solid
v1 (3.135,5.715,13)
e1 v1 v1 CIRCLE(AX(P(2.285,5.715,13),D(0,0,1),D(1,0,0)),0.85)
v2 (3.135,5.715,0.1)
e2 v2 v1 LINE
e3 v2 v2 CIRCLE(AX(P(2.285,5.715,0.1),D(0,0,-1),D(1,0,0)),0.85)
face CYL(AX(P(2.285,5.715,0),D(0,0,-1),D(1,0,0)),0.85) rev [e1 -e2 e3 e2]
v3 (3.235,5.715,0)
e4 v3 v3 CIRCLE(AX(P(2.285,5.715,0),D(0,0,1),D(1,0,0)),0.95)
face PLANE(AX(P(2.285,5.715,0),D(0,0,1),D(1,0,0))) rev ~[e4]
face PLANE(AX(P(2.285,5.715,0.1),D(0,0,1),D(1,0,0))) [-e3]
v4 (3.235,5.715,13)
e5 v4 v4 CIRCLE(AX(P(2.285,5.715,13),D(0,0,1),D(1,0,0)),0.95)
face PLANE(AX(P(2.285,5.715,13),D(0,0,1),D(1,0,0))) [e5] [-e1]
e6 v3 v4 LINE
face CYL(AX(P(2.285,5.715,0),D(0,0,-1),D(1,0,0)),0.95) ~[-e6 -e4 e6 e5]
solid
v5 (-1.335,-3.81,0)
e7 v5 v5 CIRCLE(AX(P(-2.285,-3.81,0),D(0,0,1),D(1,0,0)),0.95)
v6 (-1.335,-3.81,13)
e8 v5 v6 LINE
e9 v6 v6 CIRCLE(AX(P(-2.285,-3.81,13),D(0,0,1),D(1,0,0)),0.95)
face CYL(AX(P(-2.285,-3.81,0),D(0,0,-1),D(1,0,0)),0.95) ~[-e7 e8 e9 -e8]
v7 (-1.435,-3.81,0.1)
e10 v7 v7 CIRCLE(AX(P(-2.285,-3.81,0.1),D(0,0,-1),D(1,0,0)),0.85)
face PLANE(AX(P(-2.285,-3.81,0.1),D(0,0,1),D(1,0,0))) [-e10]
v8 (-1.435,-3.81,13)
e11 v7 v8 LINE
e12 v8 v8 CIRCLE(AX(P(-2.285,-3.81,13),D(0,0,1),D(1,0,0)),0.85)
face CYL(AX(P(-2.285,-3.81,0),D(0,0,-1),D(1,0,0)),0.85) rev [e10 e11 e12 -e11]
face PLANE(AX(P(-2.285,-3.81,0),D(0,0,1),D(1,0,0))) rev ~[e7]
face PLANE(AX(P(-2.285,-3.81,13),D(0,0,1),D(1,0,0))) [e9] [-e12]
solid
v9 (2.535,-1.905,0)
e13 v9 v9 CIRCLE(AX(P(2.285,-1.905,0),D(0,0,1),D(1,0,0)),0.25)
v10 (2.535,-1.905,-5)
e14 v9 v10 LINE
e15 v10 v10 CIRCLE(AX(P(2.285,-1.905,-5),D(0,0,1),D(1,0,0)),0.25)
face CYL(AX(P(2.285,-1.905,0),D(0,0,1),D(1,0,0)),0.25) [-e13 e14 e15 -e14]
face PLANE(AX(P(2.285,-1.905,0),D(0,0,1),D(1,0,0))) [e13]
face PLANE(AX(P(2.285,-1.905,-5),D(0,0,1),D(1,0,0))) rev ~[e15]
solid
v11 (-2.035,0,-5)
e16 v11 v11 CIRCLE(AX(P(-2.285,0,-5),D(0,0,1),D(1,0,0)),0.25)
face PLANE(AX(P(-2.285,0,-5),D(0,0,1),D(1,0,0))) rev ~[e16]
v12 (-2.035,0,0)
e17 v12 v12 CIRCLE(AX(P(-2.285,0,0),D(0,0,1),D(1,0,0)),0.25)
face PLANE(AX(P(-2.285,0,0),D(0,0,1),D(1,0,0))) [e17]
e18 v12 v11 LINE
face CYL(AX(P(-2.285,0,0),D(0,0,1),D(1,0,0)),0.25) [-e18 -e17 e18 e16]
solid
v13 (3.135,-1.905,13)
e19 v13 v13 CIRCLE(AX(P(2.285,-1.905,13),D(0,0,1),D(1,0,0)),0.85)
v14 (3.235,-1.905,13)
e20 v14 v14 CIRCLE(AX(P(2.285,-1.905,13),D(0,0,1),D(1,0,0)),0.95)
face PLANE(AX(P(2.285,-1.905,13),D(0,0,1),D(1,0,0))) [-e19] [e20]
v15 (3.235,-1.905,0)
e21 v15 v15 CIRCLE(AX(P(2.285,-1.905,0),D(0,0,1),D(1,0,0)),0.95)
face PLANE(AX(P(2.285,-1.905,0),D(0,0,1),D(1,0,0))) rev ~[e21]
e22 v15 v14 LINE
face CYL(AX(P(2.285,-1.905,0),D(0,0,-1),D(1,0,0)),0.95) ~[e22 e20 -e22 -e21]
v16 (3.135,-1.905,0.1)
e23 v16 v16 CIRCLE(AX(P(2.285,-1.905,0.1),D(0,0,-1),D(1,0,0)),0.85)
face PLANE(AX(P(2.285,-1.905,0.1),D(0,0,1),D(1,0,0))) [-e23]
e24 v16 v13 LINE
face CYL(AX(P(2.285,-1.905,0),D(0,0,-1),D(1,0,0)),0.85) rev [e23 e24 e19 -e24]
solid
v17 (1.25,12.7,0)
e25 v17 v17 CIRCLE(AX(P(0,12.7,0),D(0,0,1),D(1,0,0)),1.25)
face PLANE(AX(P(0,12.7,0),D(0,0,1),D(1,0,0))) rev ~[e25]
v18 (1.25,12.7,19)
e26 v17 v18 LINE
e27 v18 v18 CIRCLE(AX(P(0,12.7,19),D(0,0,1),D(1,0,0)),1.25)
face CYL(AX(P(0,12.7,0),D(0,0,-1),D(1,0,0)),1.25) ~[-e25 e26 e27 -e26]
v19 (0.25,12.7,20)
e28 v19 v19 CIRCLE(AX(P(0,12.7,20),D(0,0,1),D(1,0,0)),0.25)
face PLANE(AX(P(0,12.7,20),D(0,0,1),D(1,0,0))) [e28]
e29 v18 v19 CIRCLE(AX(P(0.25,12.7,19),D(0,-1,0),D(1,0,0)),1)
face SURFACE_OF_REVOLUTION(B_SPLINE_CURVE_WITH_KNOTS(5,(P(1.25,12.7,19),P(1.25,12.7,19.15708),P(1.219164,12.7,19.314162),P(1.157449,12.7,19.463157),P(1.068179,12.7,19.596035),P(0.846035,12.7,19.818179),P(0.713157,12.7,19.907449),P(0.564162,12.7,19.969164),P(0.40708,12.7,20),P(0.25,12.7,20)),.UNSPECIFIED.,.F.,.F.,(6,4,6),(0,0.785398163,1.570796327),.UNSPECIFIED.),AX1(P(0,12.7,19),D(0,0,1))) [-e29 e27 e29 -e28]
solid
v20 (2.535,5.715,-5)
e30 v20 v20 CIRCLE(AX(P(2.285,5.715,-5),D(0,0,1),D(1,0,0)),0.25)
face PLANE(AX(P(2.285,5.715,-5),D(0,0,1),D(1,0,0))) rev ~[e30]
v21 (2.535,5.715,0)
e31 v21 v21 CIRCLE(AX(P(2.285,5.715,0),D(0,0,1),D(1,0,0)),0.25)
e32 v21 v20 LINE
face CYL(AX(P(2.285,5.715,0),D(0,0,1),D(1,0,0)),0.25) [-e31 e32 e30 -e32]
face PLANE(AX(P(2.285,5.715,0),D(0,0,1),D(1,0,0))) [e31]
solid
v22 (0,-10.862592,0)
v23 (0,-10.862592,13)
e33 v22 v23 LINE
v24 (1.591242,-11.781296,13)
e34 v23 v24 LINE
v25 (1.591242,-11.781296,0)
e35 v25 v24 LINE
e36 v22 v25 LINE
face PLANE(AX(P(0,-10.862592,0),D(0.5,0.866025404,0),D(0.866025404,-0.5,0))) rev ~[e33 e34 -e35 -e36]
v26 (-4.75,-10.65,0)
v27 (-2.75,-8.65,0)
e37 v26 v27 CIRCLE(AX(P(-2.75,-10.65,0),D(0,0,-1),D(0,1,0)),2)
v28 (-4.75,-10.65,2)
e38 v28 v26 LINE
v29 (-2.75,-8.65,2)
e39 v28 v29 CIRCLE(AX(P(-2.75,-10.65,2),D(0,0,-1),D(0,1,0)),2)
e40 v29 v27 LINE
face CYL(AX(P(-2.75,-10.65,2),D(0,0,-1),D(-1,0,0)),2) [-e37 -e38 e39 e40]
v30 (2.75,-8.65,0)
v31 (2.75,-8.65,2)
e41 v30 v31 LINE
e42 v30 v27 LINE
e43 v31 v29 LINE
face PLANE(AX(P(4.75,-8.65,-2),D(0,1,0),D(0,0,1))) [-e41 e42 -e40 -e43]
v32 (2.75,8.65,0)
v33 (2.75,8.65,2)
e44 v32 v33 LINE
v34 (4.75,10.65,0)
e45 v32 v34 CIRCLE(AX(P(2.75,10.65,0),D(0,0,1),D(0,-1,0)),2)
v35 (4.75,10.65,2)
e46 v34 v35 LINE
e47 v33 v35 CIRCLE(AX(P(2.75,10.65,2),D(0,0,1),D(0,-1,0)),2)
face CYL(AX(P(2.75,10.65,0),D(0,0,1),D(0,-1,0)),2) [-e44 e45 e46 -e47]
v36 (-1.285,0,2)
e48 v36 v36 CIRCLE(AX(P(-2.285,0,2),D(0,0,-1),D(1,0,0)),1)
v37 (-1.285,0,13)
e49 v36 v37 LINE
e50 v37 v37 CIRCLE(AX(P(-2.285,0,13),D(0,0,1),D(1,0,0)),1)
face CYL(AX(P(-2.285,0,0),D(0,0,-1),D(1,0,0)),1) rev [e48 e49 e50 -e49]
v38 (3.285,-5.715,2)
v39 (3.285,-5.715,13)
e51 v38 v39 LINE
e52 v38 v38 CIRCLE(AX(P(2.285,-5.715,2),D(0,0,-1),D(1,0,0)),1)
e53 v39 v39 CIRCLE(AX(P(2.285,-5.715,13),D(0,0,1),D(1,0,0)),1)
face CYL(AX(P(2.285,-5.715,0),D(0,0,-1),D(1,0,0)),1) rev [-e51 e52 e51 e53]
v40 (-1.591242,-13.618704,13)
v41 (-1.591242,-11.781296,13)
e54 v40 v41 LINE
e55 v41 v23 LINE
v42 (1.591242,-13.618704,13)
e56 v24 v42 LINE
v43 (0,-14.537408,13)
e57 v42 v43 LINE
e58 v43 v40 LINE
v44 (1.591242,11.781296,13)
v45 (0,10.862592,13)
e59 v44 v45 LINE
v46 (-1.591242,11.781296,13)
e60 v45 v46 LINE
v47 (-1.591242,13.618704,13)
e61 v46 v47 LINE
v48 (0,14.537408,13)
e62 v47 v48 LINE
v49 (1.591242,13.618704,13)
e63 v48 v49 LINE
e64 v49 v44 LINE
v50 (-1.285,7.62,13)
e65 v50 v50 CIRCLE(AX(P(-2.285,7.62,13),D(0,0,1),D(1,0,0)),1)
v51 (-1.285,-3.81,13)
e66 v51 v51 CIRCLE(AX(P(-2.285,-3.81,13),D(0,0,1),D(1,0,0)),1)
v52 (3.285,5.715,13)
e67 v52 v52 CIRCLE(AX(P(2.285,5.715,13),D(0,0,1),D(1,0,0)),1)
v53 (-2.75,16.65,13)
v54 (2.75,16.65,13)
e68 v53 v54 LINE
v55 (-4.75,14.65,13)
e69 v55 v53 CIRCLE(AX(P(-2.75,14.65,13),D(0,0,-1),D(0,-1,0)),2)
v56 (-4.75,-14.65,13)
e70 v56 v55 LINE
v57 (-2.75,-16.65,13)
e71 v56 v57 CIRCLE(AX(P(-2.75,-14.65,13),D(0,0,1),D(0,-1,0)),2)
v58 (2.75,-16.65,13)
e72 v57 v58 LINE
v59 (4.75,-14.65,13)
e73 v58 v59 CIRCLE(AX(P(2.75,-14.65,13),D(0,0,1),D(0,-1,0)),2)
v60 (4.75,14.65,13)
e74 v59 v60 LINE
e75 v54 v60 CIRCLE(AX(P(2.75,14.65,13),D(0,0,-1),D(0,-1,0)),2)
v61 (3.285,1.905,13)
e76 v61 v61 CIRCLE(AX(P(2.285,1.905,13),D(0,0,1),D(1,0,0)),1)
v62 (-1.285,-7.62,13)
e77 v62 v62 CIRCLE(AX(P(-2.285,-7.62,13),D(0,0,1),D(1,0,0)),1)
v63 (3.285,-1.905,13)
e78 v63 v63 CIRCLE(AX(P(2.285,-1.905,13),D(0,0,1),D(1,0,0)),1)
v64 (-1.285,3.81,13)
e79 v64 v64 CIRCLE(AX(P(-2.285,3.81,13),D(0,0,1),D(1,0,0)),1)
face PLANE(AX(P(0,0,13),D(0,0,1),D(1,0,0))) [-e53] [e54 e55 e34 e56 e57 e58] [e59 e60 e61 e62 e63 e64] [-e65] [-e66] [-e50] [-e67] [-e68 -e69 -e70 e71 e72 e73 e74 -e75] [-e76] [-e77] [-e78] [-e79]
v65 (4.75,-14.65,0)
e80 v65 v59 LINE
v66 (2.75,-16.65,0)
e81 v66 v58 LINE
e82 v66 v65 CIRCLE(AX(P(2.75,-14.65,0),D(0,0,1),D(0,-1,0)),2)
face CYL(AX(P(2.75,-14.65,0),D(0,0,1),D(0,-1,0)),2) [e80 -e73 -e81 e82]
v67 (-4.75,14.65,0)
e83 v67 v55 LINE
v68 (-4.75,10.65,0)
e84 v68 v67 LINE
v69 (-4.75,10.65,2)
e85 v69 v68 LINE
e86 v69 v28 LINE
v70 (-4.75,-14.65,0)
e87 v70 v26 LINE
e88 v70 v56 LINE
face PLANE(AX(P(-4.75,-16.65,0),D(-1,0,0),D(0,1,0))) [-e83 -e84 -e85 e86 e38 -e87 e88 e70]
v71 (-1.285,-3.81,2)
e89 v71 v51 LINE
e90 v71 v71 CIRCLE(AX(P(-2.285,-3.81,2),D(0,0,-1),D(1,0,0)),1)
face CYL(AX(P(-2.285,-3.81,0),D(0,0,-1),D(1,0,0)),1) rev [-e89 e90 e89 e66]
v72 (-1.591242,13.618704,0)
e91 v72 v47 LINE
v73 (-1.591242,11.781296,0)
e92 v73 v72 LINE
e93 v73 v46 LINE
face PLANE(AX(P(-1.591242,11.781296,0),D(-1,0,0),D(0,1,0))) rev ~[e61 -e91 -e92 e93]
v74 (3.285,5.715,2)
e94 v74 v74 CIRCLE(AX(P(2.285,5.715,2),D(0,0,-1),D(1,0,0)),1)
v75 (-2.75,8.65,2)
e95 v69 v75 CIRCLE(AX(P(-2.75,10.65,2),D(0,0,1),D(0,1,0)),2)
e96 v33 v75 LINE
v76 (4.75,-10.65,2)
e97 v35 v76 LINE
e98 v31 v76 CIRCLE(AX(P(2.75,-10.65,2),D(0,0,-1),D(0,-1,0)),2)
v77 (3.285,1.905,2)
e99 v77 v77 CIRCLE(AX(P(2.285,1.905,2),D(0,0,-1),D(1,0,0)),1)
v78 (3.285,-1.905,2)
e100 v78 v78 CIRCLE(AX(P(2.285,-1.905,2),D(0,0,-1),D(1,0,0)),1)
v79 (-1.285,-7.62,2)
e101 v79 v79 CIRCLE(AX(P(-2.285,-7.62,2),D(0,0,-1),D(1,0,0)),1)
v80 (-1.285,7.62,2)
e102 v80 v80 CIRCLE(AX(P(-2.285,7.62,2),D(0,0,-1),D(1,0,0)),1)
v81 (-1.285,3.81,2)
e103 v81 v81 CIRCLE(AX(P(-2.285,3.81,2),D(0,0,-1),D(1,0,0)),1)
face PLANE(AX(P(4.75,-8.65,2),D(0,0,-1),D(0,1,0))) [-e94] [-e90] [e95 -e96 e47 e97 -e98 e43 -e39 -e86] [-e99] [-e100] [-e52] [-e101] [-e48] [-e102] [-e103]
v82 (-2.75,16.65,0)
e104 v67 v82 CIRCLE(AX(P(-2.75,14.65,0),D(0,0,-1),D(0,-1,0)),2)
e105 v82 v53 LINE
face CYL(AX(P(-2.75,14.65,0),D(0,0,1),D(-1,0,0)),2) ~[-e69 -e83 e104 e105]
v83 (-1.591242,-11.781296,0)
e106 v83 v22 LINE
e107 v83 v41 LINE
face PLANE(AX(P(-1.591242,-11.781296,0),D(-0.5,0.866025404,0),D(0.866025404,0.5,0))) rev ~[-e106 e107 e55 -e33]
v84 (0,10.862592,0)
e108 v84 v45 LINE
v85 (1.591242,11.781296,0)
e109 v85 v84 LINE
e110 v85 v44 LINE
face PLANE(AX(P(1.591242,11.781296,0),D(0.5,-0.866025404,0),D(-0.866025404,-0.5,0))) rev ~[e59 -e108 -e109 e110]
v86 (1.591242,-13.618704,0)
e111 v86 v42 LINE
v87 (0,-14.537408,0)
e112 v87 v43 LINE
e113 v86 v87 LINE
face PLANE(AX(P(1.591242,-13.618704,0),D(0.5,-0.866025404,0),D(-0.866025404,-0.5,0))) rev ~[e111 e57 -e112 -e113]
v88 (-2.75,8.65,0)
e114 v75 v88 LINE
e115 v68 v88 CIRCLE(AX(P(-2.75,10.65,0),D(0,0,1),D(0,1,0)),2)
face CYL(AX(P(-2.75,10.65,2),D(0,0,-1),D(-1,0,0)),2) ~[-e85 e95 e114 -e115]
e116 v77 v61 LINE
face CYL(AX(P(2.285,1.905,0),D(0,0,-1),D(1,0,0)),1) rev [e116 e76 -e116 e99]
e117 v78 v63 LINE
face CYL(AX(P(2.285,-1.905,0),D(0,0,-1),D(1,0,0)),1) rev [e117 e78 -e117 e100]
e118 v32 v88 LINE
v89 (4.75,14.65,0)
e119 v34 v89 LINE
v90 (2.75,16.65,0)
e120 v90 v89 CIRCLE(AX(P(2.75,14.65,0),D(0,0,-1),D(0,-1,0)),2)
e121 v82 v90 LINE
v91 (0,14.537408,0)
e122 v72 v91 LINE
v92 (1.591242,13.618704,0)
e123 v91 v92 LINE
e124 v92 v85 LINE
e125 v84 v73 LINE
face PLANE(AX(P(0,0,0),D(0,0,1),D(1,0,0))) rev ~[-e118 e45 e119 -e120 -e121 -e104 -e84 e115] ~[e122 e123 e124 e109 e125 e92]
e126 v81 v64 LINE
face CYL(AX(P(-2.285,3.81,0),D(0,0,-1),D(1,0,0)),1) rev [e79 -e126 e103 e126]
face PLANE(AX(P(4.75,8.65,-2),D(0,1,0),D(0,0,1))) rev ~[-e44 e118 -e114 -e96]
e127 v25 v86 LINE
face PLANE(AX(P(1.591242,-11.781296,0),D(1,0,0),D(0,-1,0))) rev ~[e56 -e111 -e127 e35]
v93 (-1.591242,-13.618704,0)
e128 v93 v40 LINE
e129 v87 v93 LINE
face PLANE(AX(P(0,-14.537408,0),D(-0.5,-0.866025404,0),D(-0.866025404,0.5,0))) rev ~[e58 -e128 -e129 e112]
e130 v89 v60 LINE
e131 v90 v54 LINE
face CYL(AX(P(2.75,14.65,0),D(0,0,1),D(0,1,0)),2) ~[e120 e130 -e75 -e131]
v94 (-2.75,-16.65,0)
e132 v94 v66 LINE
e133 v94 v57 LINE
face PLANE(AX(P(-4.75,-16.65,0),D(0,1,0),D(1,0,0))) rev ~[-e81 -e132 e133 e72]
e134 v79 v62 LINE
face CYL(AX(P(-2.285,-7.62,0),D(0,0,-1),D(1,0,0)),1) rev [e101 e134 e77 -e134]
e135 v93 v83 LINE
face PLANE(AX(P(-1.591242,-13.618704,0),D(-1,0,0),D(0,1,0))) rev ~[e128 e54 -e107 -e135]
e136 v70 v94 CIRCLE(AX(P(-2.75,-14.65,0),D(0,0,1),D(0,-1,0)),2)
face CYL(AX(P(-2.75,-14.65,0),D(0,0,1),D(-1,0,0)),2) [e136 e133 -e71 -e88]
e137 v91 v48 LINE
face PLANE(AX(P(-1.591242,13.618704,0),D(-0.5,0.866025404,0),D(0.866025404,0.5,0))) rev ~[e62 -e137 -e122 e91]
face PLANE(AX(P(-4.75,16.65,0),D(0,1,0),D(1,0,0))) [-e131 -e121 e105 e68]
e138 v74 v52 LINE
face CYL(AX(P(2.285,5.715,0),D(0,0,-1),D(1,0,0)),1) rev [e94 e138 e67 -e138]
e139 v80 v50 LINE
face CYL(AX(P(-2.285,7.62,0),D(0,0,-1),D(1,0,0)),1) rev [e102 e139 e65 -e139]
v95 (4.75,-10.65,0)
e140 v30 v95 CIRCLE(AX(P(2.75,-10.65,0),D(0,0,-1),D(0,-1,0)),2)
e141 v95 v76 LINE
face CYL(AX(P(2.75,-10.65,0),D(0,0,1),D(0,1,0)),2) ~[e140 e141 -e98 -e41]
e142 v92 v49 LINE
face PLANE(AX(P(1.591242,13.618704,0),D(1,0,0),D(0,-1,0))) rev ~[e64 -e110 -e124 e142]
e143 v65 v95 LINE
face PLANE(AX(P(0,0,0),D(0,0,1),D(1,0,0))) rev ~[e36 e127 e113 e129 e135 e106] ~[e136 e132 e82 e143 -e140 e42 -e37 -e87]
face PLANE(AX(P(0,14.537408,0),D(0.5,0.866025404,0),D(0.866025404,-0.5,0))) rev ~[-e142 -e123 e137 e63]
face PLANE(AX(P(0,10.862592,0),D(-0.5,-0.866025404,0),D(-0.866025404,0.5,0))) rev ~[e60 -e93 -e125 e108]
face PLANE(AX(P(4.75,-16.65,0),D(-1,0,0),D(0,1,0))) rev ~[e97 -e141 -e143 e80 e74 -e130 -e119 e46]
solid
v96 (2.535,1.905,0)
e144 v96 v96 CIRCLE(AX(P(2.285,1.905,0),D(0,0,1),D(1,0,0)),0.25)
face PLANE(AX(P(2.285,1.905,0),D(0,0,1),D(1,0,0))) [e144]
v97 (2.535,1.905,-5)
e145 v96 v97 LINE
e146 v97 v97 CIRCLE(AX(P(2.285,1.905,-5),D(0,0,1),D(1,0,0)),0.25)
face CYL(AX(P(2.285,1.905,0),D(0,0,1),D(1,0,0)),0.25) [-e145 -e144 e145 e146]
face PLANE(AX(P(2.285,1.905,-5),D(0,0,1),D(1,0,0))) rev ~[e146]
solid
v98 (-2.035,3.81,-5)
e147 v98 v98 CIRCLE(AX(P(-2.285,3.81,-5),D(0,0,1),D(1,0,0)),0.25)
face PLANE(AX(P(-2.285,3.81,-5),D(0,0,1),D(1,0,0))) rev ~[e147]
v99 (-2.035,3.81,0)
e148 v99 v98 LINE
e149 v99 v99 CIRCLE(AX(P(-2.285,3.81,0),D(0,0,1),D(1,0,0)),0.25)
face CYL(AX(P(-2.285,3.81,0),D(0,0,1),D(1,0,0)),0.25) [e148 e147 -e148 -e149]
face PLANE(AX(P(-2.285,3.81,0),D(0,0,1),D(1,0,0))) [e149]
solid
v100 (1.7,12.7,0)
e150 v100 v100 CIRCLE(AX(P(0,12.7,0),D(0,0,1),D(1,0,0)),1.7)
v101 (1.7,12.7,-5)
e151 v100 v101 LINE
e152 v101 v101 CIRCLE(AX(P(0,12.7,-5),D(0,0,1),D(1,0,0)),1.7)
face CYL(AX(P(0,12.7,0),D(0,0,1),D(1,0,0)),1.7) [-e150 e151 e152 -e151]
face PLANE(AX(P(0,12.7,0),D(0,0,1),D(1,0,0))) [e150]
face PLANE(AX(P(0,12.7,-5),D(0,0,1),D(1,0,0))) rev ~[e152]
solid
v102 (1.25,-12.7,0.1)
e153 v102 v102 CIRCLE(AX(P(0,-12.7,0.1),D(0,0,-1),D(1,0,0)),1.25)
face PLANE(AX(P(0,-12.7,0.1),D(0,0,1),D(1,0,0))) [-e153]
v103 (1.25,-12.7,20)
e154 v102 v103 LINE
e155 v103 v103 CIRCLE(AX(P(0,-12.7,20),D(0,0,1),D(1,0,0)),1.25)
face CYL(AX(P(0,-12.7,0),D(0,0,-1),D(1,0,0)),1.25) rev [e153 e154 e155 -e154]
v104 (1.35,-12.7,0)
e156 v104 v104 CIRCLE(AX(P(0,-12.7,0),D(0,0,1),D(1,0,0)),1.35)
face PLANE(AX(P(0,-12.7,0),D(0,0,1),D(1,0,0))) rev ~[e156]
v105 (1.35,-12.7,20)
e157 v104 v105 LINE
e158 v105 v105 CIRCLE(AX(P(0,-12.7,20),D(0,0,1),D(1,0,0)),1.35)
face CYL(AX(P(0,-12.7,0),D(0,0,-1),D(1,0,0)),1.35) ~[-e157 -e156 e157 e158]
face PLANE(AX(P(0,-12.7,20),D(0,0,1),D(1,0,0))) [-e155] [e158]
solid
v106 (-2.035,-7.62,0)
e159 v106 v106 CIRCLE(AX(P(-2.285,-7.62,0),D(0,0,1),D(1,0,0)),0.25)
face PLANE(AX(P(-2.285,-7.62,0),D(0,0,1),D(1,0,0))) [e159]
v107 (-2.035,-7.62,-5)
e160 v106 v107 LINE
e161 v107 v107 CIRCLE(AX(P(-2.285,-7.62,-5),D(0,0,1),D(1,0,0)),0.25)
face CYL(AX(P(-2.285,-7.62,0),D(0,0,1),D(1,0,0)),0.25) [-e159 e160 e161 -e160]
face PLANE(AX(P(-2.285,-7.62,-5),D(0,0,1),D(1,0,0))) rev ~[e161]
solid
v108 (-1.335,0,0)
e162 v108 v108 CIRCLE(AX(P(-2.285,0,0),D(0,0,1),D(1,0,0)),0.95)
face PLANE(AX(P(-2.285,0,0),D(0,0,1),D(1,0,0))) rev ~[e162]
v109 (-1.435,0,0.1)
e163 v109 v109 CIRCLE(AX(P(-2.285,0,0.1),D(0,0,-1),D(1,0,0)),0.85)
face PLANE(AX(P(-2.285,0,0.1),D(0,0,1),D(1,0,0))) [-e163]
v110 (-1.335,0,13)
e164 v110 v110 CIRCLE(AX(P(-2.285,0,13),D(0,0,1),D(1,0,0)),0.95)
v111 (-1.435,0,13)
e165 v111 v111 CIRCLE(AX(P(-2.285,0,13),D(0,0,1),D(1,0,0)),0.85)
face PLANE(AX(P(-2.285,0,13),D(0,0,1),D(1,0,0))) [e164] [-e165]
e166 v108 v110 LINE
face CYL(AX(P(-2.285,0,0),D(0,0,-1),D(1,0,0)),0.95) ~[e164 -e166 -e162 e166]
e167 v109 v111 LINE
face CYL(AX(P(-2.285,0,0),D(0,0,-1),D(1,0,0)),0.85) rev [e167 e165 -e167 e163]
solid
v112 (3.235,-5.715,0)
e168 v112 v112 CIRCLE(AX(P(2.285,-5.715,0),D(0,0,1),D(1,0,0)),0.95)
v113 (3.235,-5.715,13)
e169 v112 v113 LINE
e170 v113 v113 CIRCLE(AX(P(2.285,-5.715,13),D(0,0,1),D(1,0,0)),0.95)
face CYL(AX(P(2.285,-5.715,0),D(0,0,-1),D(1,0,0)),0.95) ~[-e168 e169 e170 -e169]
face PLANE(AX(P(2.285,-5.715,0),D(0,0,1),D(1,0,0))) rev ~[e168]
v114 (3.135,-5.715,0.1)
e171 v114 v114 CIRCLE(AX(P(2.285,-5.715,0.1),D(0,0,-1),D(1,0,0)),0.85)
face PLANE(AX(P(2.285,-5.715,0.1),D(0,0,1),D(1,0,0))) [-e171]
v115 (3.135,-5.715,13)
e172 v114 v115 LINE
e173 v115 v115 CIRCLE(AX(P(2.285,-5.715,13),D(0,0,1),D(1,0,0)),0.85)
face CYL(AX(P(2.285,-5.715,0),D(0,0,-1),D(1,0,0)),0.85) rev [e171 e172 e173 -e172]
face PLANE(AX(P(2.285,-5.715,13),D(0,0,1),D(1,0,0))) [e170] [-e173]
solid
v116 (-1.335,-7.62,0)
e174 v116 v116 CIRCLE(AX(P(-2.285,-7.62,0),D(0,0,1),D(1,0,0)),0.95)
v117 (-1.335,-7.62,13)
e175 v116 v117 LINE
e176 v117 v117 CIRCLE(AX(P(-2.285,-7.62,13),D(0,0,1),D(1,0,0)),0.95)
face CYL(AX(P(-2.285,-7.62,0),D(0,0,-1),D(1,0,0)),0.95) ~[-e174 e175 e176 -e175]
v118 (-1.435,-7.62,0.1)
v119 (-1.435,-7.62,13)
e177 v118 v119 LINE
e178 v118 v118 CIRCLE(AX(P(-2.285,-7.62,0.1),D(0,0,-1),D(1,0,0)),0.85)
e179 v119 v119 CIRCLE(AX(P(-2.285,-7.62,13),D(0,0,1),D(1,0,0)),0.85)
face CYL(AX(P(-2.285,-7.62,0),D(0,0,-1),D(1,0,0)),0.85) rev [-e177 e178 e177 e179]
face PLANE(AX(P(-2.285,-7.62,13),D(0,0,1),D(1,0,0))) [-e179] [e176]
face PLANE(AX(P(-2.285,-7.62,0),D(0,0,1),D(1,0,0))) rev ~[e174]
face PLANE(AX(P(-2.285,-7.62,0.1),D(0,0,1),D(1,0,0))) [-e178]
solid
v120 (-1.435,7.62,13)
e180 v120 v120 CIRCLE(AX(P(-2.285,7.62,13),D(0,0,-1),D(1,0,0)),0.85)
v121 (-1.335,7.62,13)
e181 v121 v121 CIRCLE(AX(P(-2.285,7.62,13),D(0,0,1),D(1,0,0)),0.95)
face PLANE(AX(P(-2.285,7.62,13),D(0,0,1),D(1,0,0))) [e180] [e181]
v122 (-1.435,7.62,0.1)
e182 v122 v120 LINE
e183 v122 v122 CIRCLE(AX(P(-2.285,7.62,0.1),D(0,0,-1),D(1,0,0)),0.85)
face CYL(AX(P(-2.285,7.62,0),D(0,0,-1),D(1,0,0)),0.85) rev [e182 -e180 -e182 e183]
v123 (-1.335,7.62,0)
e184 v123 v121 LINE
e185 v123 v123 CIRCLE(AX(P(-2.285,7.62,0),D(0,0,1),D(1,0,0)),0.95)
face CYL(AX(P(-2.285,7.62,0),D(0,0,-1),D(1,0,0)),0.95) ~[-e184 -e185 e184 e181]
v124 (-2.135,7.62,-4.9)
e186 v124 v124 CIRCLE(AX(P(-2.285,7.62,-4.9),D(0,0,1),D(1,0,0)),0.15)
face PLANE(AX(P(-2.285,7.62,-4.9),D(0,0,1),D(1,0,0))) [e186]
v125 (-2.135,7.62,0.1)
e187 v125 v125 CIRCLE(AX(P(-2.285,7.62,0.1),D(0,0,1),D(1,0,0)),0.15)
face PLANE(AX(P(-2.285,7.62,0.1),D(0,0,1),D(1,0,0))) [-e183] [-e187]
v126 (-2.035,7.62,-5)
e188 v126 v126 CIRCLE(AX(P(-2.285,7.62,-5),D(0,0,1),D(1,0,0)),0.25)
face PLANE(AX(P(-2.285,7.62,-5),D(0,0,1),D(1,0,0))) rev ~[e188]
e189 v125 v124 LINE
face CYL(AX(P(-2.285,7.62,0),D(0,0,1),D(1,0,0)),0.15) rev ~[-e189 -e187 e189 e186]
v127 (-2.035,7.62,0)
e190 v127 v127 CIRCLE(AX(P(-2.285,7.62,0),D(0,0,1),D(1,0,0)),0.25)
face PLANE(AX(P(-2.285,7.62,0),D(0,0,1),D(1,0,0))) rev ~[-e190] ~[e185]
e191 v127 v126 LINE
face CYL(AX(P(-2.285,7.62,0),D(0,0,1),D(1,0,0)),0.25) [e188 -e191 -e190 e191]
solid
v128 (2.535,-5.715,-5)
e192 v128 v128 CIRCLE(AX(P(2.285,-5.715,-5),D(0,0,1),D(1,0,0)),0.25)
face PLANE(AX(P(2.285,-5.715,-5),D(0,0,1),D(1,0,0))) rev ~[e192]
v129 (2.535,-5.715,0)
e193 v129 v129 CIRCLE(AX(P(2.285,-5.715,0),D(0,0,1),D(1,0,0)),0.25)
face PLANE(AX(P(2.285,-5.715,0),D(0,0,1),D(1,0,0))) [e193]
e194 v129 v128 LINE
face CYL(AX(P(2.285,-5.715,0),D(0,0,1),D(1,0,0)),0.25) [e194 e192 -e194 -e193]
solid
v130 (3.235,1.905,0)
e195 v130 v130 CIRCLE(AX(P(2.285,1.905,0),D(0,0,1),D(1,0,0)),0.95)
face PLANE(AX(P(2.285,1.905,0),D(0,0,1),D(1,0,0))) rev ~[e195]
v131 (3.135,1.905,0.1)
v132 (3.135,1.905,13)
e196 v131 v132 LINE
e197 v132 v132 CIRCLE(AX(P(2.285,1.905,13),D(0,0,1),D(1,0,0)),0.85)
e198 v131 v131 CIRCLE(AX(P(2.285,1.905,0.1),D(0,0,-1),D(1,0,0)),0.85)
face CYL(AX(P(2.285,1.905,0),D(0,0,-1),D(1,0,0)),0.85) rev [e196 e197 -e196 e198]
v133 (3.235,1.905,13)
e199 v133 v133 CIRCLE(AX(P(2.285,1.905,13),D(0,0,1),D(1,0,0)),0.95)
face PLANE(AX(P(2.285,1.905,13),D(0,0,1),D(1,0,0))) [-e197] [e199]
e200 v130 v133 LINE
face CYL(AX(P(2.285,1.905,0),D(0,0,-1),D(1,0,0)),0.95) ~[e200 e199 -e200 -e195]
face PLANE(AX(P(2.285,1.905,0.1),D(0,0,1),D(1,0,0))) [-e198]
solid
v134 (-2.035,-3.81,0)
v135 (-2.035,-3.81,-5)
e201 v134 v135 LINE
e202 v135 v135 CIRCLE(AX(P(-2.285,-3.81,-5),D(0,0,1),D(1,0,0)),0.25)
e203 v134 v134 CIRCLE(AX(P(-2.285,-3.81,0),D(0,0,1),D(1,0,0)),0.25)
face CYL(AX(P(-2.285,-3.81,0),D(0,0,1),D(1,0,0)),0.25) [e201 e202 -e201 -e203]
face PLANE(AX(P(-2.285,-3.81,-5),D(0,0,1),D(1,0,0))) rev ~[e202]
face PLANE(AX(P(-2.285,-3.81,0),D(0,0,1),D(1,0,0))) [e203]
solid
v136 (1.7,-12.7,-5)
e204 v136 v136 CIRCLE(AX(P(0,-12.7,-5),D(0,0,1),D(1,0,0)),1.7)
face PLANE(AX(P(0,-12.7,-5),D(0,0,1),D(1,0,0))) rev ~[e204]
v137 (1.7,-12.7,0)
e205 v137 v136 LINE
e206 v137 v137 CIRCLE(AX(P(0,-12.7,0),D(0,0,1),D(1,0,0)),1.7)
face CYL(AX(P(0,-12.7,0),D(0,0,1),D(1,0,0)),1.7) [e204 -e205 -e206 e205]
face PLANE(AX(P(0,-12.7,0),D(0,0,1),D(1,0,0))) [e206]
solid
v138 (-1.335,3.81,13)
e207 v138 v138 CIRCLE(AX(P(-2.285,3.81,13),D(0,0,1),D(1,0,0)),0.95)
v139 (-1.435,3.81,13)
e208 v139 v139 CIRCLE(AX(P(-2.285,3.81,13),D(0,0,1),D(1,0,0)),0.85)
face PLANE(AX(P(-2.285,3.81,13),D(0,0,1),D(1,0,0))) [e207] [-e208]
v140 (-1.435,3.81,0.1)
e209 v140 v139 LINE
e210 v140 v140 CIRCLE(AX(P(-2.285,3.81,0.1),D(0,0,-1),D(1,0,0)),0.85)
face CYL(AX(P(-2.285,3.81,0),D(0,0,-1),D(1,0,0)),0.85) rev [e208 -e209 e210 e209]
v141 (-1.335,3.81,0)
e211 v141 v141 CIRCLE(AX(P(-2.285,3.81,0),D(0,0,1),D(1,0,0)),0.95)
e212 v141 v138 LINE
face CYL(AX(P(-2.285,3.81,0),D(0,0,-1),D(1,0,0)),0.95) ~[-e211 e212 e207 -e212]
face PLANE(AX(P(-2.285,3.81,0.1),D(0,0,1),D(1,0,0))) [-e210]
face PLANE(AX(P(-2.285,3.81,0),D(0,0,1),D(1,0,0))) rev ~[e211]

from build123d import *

# Parameters (mm, degrees)
F0_W      = 9.5
F0_H      = 33.3
F0_R      = 1
F1_DEPTH  = 13
F2_W      = 17.3
F2_H      = 4
F3_DEPTH  = 9.501
F4_R      = 2
F5_R      = 0.25
F6_DEPTH  = 5
F7_R      = 0.95
F8_DEPTH  = 13
F9_T      = -0.1
F9_2_T    = -0.1
F9_3_T    = -0.1
F9_4_T    = -0.1
F9_5_T    = -0.1
F9_6_T    = -0.1
F9_7_T    = -0.1
F9_8_T    = -0.1
F9_9_T    = -0.1
F10_R     = 1.25
F11_DEPTH = 20
F10_R_2   = 1.35
F12_R     = 1
F13_R     = 1.7
F14_DEPTH = 5
F15_T     = -0.1


# Not quite as in the source:
# - a feature names something its author has since deleted; it is built from what else it names


with BuildPart() as f1:
    # F0 (on Top) → F1 (new body)
    with BuildSketch(Plane.XY):
        Rectangle(F0_W, F0_H)
        with Locations((-2.285, -7.62)):
            Circle(F0_R, mode=Mode.SUBTRACT)
        with Locations((-2.285, -3.81)):
            Circle(F0_R, mode=Mode.SUBTRACT)
        Polygon((0, -14.5374084972), (-1.5912424357, -13.6187042486), (-1.5912424357, -11.7812957514), (0, -10.8625915028), (1.5912424357, -11.7812957514), (1.5912424357, -13.6187042486), align=None, mode=Mode.SUBTRACT)
        with Locations((2.285, -5.715)):
            Circle(F0_R, mode=Mode.SUBTRACT)
        with Locations((2.285, -1.905)):
            Circle(F0_R, mode=Mode.SUBTRACT)
        with Locations((-2.285, 0)):
            Circle(F0_R, mode=Mode.SUBTRACT)
        with Locations((-2.285, 3.81)):
            Circle(F0_R, mode=Mode.SUBTRACT)
        with Locations((-2.285, 7.62)):
            Circle(F0_R, mode=Mode.SUBTRACT)
        with Locations((2.285, 1.905)):
            Circle(F0_R, mode=Mode.SUBTRACT)
        with Locations((2.285, 5.715)):
            Circle(F0_R, mode=Mode.SUBTRACT)
        Polygon((0, 14.5374084972), (1.5912424357, 13.6187042486), (1.5912424357, 11.7812957514), (0, 10.8625915028), (-1.5912424357, 11.7812957514), (-1.5912424357, 13.6187042486), align=None, mode=Mode.SUBTRACT)
    extrude(amount=F1_DEPTH)

    # F2 (on face) → F3 (cut, through all)
    with BuildSketch(Plane.YZ.offset(4.75)):
        Rectangle(F2_W, F2_H)
    extrude(amount=-F3_DEPTH, mode=Mode.SUBTRACT)

    # F4
    f4_edges = [f1.edges().sort_by_distance(p)[0] for p in [
        (4.75, -16.65, 6.5),
        (-4.75, -16.65, 6.5),
        (4.75, 16.65, 6.5),
        (-4.75, 16.65, 6.5),
        (-4.75, -8.65, 1),
        (-4.75, 8.65, 1),
        (4.75, 8.65, 1),
        (4.75, -8.65, 1),
    ]]
    fillet(f4_edges, radius=F4_R)


with BuildPart() as f6:
    # F5 (on face) → F6 (new body)
    with BuildSketch(Plane.XY):
        with Locations((-2.285, 7.62)):
            Circle(F5_R)
    extrude(amount=-F6_DEPTH)

    # F7 (on face) → F8 (join)
    with BuildSketch(Plane.XY):
        with Locations((-2.285, 7.62)):
            Circle(F7_R)
    extrude(amount=F8_DEPTH)

    # F9
    f9_openings = [f6.faces().sort_by_distance(p)[0] for p in [
        (-2.285, 7.62, 13),
    ]]
    offset(amount=F9_T, openings=f9_openings, kind=Kind.INTERSECTION)


with BuildPart() as f6b:
    # F5 (on face) → F6, piece 2 (new body)
    with BuildSketch(Plane.XY):
        with Locations((-2.285, 3.81)):
            Circle(F5_R)
    extrude(amount=-F6_DEPTH)


with BuildPart() as f6c:
    # F5 (on face) → F6, piece 3 (new body)
    with BuildSketch(Plane.XY):
        with Locations((2.285, 1.905)):
            Circle(F5_R)
    extrude(amount=-F6_DEPTH)


with BuildPart() as f6d:
    # F5 (on face) → F6, piece 4 (new body)
    with BuildSketch(Plane.XY):
        with Locations((2.285, 5.715)):
            Circle(F5_R)
    extrude(amount=-F6_DEPTH)


with BuildPart() as f6e:
    # F5 (on face) → F6, piece 5 (new body)
    with BuildSketch(Plane.XY):
        with Locations((-2.285, 0)):
            Circle(F5_R)
    extrude(amount=-F6_DEPTH)


with BuildPart() as f6f:
    # F5 (on face) → F6, piece 6 (new body)
    with BuildSketch(Plane.XY):
        with Locations((-2.285, -3.81)):
            Circle(F5_R)
    extrude(amount=-F6_DEPTH)


with BuildPart() as f6g:
    # F5 (on face) → F6, piece 7 (new body)
    with BuildSketch(Plane.XY):
        with Locations((-2.285, -7.62)):
            Circle(F5_R)
    extrude(amount=-F6_DEPTH)


with BuildPart() as f6h:
    # F5 (on face) → F6, piece 8 (new body)
    with BuildSketch(Plane.XY):
        with Locations((2.285, -5.715)):
            Circle(F5_R)
    extrude(amount=-F6_DEPTH)


with BuildPart() as f6i:
    # F5 (on face) → F6, piece 9 (new body)
    with BuildSketch(Plane.XY):
        with Locations((2.285, -1.905)):
            Circle(F5_R)
    extrude(amount=-F6_DEPTH)


with BuildPart() as f8:
    # F7 (on face) → F8, piece 2 (new body)
    with BuildSketch(Plane.XY):
        with Locations((-2.285, 3.81)):
            Circle(F7_R)
    extrude(amount=F8_DEPTH)

    # F9#3
    f9_3_openings = [f8.faces().sort_by_distance(p)[0] for p in [
        (-2.285, 3.81, 13),
    ]]
    offset(amount=F9_3_T, openings=f9_3_openings)


with BuildPart() as f8b:
    # F7 (on face) → F8, piece 3 (new body)
    with BuildSketch(Plane.XY):
        with Locations((2.285, 5.715)):
            Circle(F7_R)
    extrude(amount=F8_DEPTH)

    # F9#2
    f9_2_openings = [f8b.faces().sort_by_distance(p)[0] for p in [
        (2.285, 5.715, 13),
    ]]
    offset(amount=F9_2_T, openings=f9_2_openings)


with BuildPart() as f8c:
    # F7 (on face) → F8, piece 4 (new body)
    with BuildSketch(Plane.XY):
        with Locations((2.285, 1.905)):
            Circle(F7_R)
    extrude(amount=F8_DEPTH)

    # F9#4
    f9_4_openings = [f8c.faces().sort_by_distance(p)[0] for p in [
        (2.285, 1.905, 13),
    ]]
    offset(amount=F9_4_T, openings=f9_4_openings)


with BuildPart() as f8d:
    # F7 (on face) → F8, piece 5 (new body)
    with BuildSketch(Plane.XY):
        with Locations((-2.285, 0)):
            Circle(F7_R)
    extrude(amount=F8_DEPTH)

    # F9#5
    f9_5_openings = [f8d.faces().sort_by_distance(p)[0] for p in [
        (-2.285, 0, 13),
    ]]
    offset(amount=F9_5_T, openings=f9_5_openings)


with BuildPart() as f8e:
    # F7 (on face) → F8, piece 6 (new body)
    with BuildSketch(Plane.XY):
        with Locations((-2.285, -3.81)):
            Circle(F7_R)
    extrude(amount=F8_DEPTH)

    # F9#6
    f9_6_openings = [f8e.faces().sort_by_distance(p)[0] for p in [
        (-2.285, -3.81, 13),
    ]]
    offset(amount=F9_6_T, openings=f9_6_openings)


with BuildPart() as f8f:
    # F7 (on face) → F8, piece 7 (new body)
    with BuildSketch(Plane.XY):
        with Locations((-2.285, -7.62)):
            Circle(F7_R)
    extrude(amount=F8_DEPTH)

    # F9#9
    f9_9_openings = [f8f.faces().sort_by_distance(p)[0] for p in [
        (-2.285, -7.62, 13),
    ]]
    offset(amount=F9_9_T, openings=f9_9_openings)


with BuildPart() as f8g:
    # F7 (on face) → F8, piece 8 (new body)
    with BuildSketch(Plane.XY):
        with Locations((2.285, -1.905)):
            Circle(F7_R)
    extrude(amount=F8_DEPTH)

    # F9#7
    f9_7_openings = [f8g.faces().sort_by_distance(p)[0] for p in [
        (2.285, -1.905, 13),
    ]]
    offset(amount=F9_7_T, openings=f9_7_openings)


with BuildPart() as f8h:
    # F7 (on face) → F8, piece 9 (new body)
    with BuildSketch(Plane.XY):
        with Locations((2.285, -5.715)):
            Circle(F7_R)
    extrude(amount=F8_DEPTH)

    # F9#8
    f9_8_openings = [f8h.faces().sort_by_distance(p)[0] for p in [
        (2.285, -5.715, 13),
    ]]
    offset(amount=F9_8_T, openings=f9_8_openings)


with BuildPart() as f11:
    # F10 (on face) → F11 (new body)
    with BuildSketch(Plane.XY):
        with Locations((0, 12.7)):
            Circle(F10_R)
    extrude(amount=F11_DEPTH)

    # F12
    f12_edges = [f11.edges().sort_by_distance(p)[0] for p in [
        (-1.25, 12.7, 20),
    ]]
    fillet(f12_edges, radius=F12_R)


with BuildPart() as f11b:
    # F10 (on face) → F11, piece 2 (new body)
    with BuildSketch(Plane.XY):
        with Locations((0, -12.7)):
            Circle(F10_R_2)
    extrude(amount=F11_DEPTH)

    # F15
    f15_openings = [f11b.faces().sort_by_distance(p)[0] for p in [
        (0, -12.7, 20),
    ]]
    offset(amount=F15_T, openings=f15_openings)


with BuildPart() as f14:
    # F13 (on face) → F14 (new body)
    with BuildSketch(Plane.XY):
        with Locations((0, 12.7)):
            Circle(F13_R)
    extrude(amount=-F14_DEPTH)


with BuildPart() as f14b:
    # F13 (on face) → F14, piece 2 (new body)
    with BuildSketch(Plane.XY):
        with Locations((0, -12.7)):
            Circle(F13_R)
    extrude(amount=-F14_DEPTH)


solid = Compound([f1.part, f6.part, f6b.part, f6c.part, f6d.part, f6e.part, f6f.part, f6g.part, f6h.part, f6i.part, f8.part, f8b.part, f8c.part, f8d.part, f8e.part, f8f.part, f8g.part, f8h.part, f11.part, f11b.part, f14.part, f14b.part])
